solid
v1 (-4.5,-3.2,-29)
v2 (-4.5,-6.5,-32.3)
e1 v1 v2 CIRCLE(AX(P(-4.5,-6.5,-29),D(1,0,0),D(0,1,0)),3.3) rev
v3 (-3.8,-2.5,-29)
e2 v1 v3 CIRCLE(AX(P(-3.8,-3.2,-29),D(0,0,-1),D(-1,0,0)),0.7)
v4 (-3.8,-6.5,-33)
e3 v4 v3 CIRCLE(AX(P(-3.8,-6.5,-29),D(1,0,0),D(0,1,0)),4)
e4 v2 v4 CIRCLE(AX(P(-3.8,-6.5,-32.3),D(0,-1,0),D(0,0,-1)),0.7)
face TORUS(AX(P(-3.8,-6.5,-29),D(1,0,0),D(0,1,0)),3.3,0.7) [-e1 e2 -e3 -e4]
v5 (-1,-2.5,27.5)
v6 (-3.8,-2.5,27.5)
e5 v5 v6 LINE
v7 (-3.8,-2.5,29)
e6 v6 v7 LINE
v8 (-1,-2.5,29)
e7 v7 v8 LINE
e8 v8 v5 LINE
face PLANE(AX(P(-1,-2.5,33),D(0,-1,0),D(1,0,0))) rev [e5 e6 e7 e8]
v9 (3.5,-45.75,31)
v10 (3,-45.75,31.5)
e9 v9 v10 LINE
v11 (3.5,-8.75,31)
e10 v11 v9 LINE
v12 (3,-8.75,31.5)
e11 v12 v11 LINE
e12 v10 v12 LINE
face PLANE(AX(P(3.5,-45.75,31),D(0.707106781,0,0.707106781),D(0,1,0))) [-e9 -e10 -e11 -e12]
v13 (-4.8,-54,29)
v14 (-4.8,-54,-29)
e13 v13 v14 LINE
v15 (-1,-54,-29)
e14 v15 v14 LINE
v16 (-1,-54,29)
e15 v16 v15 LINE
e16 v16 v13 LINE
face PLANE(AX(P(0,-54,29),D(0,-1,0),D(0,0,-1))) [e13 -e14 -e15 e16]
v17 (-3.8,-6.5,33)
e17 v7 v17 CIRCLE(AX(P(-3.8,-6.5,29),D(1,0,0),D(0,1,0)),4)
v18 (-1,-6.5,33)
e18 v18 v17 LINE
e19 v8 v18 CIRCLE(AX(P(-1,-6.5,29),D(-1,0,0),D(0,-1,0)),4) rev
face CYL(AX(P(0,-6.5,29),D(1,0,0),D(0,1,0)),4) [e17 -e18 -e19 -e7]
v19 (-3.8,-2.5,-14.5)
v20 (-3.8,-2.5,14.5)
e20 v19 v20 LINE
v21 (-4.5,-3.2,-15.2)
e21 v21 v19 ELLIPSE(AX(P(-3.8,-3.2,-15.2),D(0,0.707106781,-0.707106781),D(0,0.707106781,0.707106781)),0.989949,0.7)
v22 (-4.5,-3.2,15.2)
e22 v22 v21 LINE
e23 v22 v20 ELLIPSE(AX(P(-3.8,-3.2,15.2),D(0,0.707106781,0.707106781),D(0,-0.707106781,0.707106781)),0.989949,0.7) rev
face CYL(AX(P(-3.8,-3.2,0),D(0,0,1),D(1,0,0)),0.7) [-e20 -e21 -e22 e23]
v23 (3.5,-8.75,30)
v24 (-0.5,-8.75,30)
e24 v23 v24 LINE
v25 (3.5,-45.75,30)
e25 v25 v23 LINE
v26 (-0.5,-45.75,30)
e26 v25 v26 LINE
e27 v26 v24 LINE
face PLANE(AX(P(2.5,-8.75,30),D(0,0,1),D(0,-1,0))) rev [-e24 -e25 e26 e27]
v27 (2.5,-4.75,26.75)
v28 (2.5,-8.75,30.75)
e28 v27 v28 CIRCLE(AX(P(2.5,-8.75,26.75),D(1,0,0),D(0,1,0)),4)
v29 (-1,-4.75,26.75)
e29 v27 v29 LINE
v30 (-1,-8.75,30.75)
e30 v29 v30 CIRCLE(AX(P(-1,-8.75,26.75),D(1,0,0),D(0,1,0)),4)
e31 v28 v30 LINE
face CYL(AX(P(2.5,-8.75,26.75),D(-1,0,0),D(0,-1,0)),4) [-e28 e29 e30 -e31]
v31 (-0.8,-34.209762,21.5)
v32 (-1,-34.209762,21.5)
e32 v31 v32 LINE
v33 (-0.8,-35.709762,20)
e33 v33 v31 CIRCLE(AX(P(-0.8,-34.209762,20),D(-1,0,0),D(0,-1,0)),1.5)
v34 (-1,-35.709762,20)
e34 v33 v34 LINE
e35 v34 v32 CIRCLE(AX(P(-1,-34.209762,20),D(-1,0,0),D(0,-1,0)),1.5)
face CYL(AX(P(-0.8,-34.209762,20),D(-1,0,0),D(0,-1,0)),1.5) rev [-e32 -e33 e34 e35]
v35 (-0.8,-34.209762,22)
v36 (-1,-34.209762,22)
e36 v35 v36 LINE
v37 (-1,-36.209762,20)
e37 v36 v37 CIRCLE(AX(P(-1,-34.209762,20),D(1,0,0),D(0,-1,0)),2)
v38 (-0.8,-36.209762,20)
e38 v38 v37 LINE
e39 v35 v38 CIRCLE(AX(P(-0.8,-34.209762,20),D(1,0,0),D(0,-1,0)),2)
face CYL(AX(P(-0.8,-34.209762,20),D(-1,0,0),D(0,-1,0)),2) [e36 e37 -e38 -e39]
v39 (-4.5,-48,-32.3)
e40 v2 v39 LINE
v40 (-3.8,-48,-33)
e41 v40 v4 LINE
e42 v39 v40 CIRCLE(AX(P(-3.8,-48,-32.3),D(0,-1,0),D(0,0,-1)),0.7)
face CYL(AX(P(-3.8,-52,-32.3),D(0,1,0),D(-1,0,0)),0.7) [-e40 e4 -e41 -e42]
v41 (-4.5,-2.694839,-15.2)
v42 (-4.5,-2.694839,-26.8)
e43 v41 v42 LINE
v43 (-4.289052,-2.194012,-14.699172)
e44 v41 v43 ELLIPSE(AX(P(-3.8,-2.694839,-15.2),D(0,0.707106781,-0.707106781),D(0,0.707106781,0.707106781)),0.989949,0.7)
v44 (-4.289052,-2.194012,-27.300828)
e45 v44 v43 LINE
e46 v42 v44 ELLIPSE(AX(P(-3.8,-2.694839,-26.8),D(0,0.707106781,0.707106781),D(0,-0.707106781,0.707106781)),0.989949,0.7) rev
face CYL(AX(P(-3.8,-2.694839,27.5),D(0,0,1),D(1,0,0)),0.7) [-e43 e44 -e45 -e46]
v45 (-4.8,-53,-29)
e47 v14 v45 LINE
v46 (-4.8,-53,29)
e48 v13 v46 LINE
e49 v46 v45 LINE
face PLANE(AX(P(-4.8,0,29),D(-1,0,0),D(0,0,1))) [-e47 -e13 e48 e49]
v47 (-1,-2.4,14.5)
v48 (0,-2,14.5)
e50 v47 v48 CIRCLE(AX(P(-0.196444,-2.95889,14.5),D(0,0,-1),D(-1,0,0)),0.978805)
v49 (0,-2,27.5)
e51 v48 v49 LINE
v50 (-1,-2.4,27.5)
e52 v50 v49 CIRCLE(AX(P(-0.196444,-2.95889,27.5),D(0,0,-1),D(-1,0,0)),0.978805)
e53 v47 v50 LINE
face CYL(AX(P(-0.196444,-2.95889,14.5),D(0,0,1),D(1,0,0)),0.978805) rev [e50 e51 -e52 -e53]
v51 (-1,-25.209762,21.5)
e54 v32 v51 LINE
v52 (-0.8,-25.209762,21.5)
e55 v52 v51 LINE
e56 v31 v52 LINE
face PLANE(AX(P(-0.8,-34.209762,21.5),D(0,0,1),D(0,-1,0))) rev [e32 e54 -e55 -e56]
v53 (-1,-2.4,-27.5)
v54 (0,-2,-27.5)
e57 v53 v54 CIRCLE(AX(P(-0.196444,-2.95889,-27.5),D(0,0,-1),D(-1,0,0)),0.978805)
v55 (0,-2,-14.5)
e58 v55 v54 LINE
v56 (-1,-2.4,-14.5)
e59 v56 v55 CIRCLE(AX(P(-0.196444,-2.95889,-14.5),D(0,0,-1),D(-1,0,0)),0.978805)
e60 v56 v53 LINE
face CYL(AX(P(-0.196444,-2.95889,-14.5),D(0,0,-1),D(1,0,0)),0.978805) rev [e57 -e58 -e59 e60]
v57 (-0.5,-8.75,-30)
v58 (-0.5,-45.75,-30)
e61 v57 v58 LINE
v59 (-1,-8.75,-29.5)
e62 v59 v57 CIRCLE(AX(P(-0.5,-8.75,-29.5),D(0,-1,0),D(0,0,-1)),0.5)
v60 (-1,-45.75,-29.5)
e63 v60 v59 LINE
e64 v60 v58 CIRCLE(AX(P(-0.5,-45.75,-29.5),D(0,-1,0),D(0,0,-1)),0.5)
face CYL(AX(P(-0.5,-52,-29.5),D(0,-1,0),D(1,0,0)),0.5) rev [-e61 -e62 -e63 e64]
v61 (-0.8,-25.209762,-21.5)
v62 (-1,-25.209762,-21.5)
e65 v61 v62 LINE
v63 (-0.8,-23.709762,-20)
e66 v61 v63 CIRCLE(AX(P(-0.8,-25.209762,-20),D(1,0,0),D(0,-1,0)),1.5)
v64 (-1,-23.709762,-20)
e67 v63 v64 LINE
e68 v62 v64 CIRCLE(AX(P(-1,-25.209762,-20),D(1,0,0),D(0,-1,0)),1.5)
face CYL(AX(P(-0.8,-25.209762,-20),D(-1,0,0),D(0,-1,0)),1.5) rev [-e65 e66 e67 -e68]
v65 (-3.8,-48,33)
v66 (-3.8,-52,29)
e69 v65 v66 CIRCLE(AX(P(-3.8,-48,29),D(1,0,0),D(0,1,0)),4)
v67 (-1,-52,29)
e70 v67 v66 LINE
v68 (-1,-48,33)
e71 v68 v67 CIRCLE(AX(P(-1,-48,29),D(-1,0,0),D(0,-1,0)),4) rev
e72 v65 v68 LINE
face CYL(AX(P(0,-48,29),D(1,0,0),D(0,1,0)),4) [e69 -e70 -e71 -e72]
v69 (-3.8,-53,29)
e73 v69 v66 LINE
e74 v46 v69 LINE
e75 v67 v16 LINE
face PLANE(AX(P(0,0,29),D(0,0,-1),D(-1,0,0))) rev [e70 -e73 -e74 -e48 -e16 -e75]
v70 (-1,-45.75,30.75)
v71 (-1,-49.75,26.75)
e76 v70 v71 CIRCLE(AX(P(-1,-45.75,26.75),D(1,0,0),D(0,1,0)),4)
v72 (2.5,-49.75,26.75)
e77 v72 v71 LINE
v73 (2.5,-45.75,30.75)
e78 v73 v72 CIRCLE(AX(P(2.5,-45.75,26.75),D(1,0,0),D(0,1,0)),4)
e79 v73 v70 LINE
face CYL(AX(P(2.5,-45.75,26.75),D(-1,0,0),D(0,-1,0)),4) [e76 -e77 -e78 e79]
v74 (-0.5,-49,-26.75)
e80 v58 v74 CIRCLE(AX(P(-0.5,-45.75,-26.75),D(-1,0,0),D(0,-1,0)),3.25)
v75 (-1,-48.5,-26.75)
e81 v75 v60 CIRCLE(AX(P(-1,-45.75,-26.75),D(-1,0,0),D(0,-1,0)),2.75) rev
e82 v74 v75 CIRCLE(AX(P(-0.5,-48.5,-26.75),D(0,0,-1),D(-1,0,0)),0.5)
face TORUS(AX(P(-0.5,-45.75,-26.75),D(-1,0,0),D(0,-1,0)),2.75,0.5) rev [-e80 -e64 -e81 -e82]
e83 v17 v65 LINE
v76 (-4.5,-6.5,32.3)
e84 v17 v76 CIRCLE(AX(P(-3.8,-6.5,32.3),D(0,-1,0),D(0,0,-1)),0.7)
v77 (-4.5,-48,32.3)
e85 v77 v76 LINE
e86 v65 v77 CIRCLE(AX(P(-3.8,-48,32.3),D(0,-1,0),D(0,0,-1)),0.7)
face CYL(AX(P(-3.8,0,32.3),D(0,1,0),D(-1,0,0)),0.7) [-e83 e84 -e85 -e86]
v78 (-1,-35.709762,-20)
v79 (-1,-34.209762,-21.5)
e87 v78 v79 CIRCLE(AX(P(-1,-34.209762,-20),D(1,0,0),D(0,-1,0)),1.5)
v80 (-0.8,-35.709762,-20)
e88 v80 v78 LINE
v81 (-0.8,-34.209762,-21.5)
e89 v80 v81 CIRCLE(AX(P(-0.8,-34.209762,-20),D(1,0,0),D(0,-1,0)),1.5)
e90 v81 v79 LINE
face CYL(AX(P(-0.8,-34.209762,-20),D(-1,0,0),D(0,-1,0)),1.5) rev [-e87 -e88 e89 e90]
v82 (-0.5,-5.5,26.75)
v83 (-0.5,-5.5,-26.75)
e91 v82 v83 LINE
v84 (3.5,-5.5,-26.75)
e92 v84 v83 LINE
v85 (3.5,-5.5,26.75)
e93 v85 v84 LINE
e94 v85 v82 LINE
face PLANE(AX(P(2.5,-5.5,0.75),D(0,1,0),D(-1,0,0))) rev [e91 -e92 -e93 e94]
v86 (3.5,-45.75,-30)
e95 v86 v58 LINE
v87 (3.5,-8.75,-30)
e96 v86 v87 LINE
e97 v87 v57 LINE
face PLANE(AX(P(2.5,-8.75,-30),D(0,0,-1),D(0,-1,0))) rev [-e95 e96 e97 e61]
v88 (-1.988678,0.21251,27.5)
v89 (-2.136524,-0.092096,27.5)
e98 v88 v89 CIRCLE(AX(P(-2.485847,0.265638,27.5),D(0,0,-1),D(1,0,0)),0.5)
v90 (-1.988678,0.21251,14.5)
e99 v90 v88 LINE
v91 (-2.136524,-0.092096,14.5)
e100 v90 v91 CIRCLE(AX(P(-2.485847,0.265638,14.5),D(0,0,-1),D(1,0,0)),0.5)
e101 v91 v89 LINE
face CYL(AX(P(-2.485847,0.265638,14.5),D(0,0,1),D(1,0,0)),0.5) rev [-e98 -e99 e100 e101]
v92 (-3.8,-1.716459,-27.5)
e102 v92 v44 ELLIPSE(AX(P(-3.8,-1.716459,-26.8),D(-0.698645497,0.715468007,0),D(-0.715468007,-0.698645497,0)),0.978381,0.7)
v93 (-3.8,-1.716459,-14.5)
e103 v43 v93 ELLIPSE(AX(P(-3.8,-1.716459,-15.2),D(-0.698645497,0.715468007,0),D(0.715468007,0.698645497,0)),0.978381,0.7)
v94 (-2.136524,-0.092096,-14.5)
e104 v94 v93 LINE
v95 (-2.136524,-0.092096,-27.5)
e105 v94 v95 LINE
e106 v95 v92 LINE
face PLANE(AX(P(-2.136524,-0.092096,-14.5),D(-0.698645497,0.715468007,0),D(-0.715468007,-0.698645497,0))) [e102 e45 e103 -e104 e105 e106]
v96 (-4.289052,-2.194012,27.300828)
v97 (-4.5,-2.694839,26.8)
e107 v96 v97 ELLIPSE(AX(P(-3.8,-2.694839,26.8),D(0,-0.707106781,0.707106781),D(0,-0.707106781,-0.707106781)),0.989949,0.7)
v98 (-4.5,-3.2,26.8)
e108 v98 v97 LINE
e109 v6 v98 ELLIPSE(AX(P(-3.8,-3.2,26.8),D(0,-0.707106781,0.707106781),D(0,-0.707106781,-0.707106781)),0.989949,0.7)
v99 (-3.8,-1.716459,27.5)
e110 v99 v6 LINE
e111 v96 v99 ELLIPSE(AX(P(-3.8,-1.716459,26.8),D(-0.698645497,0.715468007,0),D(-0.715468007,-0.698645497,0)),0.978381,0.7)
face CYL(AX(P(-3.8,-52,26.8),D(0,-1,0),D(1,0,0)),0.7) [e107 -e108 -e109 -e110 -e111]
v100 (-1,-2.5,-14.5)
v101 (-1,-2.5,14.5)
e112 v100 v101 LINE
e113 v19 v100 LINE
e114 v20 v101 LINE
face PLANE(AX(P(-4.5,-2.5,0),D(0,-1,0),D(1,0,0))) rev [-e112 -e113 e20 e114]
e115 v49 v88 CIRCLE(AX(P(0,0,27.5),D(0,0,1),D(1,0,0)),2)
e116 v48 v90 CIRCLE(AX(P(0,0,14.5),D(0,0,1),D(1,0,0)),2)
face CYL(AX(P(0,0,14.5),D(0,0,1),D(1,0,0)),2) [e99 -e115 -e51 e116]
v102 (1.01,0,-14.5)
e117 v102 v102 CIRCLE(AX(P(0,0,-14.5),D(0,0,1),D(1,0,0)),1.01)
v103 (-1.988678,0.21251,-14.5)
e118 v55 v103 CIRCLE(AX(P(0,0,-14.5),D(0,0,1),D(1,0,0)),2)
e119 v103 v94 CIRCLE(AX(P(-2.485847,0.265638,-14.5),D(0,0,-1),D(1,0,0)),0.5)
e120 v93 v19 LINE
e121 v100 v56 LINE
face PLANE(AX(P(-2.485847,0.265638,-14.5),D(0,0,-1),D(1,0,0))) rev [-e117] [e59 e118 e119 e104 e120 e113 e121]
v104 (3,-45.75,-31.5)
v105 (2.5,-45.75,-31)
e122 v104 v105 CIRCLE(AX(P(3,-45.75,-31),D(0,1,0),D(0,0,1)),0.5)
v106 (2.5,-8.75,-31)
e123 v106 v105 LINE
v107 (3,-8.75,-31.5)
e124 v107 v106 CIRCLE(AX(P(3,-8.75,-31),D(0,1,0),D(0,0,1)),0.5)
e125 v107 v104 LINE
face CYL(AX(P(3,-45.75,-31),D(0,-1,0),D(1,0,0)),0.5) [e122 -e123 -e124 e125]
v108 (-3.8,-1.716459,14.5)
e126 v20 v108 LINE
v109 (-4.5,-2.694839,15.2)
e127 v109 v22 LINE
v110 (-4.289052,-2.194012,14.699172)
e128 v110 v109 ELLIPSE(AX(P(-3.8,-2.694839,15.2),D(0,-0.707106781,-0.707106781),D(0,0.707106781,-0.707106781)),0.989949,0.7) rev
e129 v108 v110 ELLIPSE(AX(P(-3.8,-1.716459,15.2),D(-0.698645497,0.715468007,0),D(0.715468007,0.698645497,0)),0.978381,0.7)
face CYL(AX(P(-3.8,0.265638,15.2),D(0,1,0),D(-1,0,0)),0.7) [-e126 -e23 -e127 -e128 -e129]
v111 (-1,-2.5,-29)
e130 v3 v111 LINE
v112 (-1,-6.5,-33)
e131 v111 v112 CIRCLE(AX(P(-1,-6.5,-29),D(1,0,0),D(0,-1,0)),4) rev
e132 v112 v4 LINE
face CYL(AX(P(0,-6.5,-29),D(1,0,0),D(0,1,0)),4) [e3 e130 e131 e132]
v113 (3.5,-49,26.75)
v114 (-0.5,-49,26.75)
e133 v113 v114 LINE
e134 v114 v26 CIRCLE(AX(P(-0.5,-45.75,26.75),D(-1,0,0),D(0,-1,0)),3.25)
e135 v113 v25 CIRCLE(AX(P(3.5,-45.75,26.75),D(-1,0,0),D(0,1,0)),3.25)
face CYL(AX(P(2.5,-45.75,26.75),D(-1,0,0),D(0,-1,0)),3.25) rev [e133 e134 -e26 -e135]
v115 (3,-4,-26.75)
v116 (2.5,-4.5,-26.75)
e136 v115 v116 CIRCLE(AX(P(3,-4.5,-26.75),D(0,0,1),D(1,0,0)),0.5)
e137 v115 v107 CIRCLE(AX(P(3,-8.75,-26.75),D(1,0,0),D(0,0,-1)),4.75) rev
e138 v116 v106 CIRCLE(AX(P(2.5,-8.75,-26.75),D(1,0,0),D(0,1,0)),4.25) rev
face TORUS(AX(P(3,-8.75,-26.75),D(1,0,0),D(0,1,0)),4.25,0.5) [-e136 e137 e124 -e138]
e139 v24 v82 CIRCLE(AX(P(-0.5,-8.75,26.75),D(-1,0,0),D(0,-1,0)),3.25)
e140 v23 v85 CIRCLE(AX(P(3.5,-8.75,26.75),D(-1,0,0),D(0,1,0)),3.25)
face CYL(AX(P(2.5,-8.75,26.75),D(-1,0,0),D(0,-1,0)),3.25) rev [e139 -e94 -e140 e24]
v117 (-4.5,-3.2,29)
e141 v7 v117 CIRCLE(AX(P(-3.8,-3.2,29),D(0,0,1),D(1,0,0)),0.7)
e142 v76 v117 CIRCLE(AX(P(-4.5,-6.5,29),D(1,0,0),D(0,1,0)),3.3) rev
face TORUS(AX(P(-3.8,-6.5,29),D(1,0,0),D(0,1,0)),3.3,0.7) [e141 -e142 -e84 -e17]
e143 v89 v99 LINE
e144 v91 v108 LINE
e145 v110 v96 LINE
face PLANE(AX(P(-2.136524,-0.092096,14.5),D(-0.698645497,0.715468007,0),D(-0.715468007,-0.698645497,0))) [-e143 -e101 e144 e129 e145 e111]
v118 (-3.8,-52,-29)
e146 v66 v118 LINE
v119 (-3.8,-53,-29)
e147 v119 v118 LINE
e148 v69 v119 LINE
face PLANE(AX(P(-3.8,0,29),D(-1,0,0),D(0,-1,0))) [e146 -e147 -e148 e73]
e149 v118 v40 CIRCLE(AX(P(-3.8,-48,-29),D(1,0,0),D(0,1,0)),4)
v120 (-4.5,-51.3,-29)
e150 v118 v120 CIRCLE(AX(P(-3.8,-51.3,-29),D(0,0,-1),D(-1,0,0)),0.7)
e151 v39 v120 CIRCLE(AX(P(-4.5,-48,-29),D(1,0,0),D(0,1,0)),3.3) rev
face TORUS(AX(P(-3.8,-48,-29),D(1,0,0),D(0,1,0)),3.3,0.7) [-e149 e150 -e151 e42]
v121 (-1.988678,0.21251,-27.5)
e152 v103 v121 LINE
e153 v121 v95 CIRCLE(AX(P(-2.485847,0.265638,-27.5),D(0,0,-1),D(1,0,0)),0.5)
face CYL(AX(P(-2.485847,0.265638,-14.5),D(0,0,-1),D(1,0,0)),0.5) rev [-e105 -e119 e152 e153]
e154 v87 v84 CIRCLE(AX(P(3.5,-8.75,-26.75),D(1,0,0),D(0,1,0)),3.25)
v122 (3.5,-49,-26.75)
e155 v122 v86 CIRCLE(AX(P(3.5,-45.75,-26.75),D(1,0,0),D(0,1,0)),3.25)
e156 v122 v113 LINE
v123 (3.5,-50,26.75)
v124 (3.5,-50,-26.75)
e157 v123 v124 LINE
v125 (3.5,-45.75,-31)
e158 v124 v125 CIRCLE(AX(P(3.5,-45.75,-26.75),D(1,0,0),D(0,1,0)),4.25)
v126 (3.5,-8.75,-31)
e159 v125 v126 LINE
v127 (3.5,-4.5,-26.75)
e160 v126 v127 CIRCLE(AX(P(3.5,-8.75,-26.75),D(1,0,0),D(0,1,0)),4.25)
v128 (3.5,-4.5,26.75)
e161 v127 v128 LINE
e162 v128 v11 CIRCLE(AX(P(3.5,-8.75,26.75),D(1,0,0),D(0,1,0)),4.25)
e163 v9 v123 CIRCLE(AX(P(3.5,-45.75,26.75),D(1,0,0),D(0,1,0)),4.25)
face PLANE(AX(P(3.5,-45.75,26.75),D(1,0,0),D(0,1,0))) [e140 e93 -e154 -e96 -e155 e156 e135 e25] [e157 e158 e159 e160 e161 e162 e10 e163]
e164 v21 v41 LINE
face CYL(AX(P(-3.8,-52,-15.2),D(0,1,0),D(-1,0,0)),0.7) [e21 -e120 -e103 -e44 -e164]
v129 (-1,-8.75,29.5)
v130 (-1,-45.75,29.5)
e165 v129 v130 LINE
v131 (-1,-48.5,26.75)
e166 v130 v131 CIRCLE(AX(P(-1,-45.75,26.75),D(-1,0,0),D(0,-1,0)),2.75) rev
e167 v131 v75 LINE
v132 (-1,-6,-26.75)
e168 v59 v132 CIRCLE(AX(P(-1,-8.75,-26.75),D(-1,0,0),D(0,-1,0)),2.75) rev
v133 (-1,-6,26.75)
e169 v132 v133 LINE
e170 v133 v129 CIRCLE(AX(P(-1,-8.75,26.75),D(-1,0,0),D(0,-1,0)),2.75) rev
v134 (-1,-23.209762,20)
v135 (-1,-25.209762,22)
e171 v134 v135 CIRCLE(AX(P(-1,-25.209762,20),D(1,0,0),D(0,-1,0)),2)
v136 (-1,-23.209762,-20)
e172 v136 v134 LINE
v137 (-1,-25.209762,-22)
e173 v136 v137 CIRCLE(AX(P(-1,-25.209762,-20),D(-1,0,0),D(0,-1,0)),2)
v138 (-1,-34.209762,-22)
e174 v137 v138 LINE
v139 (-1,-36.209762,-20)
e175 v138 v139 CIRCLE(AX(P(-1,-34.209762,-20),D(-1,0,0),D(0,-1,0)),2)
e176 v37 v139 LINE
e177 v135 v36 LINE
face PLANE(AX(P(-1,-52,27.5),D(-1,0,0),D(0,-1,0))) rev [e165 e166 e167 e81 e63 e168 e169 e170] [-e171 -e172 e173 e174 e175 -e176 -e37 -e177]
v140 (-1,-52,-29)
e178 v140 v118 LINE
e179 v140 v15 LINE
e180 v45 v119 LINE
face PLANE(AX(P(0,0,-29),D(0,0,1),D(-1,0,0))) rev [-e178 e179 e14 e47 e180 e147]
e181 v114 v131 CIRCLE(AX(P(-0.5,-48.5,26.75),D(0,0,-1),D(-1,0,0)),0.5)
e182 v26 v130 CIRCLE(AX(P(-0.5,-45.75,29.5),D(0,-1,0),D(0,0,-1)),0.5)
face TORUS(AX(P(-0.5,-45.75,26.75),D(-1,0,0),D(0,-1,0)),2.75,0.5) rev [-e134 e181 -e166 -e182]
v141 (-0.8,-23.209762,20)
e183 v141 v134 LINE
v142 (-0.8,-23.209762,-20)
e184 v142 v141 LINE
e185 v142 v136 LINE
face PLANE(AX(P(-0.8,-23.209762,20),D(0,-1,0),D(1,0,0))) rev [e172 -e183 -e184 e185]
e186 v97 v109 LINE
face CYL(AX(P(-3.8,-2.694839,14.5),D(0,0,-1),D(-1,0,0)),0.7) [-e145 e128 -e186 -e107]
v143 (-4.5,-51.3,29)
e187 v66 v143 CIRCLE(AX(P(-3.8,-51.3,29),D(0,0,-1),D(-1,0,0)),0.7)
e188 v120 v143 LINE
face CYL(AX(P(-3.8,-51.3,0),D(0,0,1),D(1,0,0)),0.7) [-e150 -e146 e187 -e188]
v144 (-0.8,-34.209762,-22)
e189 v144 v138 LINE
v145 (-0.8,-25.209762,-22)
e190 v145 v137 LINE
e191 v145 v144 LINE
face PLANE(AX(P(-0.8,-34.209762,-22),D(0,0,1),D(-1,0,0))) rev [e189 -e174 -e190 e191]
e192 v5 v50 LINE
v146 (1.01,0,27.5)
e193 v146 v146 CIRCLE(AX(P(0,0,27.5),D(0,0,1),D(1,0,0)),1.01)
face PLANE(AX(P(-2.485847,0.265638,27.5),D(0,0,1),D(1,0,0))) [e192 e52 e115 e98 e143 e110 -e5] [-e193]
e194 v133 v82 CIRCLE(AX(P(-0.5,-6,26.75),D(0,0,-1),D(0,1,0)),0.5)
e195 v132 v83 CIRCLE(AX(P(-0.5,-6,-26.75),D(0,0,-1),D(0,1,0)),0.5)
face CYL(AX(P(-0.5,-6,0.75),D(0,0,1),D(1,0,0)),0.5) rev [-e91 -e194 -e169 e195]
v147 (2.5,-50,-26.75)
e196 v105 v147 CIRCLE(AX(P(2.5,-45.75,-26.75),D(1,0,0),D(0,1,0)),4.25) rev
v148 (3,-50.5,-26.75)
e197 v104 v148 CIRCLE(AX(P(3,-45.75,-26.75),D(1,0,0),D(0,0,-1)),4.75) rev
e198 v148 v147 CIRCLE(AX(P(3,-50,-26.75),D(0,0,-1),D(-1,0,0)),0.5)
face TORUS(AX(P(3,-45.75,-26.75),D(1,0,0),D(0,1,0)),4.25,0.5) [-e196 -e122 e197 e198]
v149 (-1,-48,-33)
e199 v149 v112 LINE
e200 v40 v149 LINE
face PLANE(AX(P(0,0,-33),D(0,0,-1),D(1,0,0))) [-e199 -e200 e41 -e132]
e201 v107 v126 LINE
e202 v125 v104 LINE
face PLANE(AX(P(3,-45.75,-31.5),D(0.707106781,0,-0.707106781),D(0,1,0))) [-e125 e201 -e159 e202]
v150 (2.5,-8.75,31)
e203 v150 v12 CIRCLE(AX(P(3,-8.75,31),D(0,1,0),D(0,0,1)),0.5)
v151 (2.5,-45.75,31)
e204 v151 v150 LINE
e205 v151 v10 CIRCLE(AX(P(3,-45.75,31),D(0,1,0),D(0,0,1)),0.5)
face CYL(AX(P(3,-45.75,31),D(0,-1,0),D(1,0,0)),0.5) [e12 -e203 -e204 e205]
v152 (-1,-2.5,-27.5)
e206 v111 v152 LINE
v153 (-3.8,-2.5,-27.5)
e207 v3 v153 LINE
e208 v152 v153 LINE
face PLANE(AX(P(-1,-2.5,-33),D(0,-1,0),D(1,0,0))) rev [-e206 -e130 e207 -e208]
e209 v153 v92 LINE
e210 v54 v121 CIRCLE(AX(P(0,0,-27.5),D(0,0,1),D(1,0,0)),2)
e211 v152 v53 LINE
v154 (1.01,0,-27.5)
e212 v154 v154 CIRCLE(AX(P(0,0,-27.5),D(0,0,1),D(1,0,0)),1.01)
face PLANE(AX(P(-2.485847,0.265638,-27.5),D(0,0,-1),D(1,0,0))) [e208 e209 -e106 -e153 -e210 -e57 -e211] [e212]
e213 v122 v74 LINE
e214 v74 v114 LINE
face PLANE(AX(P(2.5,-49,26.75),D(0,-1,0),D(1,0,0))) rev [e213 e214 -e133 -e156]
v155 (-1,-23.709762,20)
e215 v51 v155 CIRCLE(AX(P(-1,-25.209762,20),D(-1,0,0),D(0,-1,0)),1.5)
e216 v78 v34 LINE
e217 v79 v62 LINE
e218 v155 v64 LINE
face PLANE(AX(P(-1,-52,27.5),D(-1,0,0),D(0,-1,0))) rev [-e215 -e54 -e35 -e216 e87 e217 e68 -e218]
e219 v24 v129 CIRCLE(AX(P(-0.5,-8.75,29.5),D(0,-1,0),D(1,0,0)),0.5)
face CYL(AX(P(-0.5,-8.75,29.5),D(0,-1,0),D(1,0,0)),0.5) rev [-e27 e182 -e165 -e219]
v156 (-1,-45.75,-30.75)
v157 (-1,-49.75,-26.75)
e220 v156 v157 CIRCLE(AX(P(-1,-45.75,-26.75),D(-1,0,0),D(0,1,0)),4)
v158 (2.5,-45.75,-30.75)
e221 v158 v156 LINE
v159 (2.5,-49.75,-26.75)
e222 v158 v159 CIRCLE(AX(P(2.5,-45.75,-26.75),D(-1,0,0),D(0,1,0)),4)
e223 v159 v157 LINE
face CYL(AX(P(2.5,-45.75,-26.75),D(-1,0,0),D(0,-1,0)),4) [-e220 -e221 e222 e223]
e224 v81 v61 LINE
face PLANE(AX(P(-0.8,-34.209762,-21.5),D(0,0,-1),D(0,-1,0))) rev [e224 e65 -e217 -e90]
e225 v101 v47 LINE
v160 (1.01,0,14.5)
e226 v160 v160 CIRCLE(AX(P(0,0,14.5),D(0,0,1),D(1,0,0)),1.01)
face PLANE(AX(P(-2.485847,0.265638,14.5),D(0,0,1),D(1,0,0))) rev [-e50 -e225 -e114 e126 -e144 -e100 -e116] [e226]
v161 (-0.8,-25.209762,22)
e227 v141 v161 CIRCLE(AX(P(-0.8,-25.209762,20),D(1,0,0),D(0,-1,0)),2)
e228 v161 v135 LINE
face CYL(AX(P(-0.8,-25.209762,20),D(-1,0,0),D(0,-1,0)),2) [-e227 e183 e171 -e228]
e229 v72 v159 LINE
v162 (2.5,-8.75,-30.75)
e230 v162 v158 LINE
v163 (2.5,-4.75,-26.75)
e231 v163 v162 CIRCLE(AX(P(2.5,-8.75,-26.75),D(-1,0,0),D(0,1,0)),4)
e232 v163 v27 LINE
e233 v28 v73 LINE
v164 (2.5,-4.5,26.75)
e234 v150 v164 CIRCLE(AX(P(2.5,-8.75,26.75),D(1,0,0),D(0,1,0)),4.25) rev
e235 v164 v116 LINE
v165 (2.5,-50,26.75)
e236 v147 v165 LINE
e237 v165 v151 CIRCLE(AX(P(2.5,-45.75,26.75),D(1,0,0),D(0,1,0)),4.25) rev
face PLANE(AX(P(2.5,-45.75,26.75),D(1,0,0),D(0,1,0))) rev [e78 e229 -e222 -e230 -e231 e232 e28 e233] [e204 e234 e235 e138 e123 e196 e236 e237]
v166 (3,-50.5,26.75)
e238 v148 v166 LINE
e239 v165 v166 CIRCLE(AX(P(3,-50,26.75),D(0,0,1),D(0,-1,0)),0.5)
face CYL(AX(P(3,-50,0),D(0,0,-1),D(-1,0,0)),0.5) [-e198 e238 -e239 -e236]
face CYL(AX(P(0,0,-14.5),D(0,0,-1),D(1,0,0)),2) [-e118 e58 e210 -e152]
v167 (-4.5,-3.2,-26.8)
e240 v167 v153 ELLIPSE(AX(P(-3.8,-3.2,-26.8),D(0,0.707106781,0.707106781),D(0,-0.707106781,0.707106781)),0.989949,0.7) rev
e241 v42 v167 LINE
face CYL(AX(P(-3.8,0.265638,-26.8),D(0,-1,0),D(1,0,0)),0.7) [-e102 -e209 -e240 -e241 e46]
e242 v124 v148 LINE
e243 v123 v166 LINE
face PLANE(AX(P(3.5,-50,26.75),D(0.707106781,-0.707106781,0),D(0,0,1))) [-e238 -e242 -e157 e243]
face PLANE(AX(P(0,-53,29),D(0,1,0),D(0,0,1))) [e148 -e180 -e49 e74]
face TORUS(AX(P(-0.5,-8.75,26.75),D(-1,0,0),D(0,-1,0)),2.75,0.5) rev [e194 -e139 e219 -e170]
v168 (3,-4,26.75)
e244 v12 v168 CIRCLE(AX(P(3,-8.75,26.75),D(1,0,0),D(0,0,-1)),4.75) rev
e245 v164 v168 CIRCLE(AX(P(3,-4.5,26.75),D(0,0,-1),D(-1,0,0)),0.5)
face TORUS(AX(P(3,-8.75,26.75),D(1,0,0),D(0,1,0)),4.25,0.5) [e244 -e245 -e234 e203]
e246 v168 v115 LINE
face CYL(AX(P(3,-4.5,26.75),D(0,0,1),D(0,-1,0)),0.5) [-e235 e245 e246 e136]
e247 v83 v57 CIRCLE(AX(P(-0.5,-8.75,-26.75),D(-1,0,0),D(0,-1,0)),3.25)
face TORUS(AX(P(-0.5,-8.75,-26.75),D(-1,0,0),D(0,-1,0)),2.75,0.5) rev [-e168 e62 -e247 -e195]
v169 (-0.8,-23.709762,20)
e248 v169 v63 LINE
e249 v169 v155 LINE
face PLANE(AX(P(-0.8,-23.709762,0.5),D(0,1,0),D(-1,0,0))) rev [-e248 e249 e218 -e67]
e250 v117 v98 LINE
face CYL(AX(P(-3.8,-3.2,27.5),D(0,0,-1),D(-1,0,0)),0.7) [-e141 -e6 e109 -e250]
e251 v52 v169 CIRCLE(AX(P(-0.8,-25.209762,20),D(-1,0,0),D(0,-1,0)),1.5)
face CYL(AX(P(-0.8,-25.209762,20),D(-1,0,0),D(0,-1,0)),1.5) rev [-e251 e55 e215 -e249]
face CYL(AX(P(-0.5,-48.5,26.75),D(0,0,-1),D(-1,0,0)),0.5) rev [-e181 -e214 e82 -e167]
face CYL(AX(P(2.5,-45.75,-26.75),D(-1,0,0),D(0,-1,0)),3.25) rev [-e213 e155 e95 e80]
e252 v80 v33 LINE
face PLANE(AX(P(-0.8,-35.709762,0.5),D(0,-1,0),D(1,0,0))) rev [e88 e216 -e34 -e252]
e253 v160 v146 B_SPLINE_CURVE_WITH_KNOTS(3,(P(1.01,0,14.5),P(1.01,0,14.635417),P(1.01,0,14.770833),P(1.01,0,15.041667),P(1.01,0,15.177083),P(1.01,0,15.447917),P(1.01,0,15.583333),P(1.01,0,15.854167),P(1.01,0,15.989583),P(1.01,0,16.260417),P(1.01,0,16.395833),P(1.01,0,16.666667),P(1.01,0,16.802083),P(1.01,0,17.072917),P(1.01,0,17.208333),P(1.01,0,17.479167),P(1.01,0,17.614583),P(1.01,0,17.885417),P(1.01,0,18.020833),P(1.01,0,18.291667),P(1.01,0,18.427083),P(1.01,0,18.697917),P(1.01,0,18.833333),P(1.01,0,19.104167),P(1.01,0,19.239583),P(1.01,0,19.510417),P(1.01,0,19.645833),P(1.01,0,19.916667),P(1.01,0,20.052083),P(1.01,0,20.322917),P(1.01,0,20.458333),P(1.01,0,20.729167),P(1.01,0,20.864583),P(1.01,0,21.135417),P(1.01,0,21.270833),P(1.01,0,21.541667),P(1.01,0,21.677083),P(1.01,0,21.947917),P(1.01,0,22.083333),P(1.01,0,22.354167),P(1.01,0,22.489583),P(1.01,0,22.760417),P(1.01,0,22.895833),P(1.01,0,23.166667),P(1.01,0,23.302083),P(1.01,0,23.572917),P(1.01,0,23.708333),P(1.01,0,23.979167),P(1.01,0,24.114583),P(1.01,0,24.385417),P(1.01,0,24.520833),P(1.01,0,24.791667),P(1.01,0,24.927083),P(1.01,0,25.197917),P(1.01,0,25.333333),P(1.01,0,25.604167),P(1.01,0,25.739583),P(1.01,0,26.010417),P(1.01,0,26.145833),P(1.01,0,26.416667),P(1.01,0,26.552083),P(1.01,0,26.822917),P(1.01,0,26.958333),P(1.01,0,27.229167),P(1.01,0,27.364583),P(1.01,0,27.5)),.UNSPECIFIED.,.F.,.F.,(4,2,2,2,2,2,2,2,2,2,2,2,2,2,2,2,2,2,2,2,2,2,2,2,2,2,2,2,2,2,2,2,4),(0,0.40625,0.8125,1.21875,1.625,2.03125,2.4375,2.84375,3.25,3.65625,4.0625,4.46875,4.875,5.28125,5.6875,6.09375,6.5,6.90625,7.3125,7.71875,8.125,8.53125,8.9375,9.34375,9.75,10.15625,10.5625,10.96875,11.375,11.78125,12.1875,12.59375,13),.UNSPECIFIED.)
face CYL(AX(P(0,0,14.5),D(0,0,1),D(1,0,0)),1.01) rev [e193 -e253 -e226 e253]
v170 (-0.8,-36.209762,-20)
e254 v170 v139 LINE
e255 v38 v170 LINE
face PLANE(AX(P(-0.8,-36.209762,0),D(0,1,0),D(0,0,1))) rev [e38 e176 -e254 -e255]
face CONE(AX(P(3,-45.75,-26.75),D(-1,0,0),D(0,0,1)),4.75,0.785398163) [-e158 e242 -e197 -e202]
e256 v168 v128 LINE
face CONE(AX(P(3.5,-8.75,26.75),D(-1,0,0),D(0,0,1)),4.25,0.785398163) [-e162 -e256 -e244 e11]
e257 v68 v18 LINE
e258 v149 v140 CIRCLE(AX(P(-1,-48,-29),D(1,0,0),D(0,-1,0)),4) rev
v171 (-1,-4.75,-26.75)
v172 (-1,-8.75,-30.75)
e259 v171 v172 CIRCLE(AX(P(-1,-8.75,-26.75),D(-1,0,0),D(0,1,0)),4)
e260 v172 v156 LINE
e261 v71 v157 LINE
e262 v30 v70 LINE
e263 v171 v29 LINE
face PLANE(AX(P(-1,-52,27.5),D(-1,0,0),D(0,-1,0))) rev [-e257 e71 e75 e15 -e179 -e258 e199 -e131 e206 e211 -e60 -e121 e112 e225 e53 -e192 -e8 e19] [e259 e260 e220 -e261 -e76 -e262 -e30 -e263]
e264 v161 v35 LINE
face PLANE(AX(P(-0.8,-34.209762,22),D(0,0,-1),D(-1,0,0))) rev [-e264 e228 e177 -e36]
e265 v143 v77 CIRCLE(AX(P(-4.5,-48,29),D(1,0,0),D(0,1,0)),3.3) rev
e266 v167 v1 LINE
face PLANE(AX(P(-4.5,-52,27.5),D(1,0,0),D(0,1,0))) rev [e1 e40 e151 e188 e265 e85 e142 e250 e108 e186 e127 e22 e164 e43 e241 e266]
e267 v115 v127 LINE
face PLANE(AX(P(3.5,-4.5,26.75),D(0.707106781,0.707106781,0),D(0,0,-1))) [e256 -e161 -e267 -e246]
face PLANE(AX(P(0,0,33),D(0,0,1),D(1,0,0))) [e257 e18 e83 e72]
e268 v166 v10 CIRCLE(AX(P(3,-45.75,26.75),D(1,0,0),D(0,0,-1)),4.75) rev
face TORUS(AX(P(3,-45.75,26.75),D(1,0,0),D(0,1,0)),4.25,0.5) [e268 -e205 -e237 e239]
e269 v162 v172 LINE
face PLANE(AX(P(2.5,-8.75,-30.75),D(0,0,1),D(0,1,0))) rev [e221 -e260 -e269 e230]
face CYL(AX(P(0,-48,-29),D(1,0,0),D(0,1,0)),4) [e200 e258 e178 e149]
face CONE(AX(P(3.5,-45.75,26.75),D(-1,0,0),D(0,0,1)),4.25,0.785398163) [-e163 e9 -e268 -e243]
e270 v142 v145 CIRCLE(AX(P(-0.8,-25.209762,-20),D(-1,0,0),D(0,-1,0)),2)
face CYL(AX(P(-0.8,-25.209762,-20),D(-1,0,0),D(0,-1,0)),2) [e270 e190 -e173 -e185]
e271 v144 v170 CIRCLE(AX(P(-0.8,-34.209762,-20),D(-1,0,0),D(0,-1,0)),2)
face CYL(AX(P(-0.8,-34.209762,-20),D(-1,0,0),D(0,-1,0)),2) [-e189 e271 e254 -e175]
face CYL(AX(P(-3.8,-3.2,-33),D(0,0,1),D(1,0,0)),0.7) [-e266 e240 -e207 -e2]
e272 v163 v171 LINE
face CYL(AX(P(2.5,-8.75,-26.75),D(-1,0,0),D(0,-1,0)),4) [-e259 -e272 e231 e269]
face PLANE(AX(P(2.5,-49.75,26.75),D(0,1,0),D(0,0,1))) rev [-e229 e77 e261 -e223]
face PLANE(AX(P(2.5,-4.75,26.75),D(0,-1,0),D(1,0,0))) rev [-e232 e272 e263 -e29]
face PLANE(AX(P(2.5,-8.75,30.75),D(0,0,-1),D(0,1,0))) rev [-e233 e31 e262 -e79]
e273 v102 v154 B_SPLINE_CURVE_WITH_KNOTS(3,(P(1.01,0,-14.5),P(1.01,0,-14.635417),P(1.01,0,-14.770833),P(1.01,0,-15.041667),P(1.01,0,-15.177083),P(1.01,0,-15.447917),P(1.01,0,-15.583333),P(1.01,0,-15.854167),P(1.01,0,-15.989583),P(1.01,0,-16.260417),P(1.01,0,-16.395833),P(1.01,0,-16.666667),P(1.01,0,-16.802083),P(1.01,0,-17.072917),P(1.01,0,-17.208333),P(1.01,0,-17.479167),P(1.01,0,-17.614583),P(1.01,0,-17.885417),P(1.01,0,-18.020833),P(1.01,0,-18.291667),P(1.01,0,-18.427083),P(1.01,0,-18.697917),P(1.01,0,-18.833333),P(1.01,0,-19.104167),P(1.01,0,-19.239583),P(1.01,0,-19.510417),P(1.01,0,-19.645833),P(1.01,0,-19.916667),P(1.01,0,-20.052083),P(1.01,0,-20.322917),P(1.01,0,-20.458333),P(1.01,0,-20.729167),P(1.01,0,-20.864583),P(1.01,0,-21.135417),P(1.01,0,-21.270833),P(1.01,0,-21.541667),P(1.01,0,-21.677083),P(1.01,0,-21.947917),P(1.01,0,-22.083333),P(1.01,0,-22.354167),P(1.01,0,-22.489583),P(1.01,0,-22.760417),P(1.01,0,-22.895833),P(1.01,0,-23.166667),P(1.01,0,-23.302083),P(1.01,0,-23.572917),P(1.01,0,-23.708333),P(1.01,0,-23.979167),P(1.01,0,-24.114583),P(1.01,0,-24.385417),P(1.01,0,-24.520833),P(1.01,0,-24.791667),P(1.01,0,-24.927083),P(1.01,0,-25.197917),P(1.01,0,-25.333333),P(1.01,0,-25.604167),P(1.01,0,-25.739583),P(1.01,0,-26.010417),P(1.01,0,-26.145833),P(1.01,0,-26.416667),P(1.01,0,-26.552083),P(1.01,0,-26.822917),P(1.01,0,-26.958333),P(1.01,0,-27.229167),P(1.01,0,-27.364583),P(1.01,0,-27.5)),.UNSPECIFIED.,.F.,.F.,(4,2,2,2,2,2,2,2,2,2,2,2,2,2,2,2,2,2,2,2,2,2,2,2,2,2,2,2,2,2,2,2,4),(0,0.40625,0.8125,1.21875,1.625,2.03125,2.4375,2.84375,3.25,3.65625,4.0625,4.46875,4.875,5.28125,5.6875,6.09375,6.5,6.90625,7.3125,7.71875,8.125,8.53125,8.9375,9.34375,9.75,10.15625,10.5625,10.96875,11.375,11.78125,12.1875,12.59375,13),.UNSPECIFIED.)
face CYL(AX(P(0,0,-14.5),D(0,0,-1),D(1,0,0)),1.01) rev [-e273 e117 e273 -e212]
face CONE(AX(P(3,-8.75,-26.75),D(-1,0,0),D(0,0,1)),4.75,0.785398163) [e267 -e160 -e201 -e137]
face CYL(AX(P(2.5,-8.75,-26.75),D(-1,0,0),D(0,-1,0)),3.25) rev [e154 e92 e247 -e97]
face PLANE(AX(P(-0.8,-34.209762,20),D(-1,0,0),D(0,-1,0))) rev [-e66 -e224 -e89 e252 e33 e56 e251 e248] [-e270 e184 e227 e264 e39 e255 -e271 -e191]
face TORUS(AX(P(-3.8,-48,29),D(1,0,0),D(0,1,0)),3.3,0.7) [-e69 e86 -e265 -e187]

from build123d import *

# Parameters (mm, degrees)
SKETCH1_R            = 1
BOSS_EXTRUDE1_DEPTH  = 27.5
SKETCH2_R            = 1.01
BOSS_EXTRUDE2_DEPTH  = 13
SKETCH3_W            = 3.5
SKETCH3_H            = 13
BOSS_EXTRUDE3_DEPTH  = 49.6
SKETCH7_W            = 3.5
SKETCH7_H            = 49.5
BOSS_EXTRUDE6_DEPTH  = 5.5
SKETCH8_W            = 3.5
SKETCH8_H            = 49.5
BOSS_EXTRUDE7_DEPTH  = 14.5
FILLET2_R            = 4
BOSS_EXTRUDE8_DEPTH  = 29
BOSS_EXTRUDE9_DEPTH  = 0.2
BOSS_EXTRUDE11_DEPTH = 3.5
BOSS_EXTRUDE12_DEPTH = 1
FILLET2_OF_MIRROR1_R = 4
SKETCH15_R           = 1
CUT_EXTRUDE1_DEPTH   = 82.236014181
CHAMFER1_SIZE        = 0.5
FILLET3_R            = 0.5
FILLET4_R            = 0.5
FILLET6_R            = 0.7


with BuildPart() as part:
    # Sketch1 → Boss-Extrude1 (new body)
    with BuildSketch(Plane.XY):
        Circle(SKETCH1_R)
    boss_extrude1 = extrude(amount=BOSS_EXTRUDE1_DEPTH)


with BuildPart() as body_2:
    # Sketch2 → Boss-Extrude2 (new body)
    with BuildSketch(Plane.XY.offset(27.5)):
        with BuildLine():
            Line((-2.136524473, -0.092095918), (-4.5, -2.4))
            Line((-4.5, -2.4), (-1, -2.4))
            ThreePointArc((-1, -2.4), (-0.559963282, -2.050091796), (0, -2))
            ThreePointArc((0, -2), (1.487450997, 1.336970281), (-1.988677777, 0.212510468))
            ThreePointArc((-1.988677777, 0.212510468), (-2.036032236, 0.047311543), (-2.136524473, -0.092095918))
        make_face()
        Circle(SKETCH2_R, mode=Mode.SUBTRACT)
    boss_extrude2 = extrude(amount=-BOSS_EXTRUDE2_DEPTH)

    # Sketch3 → Boss-Extrude3 (add)
    with BuildSketch(Plane.XZ.offset(2.4)):
        with Locations((-2.75, 21)):
            Rectangle(SKETCH3_W, SKETCH3_H)
    boss_extrude3 = extrude(amount=BOSS_EXTRUDE3_DEPTH)

    # Sketch7 → Boss-Extrude6 (add)
    with BuildSketch(Plane.XY.offset(27.5)):
        with Locations((-2.75, -27.25)):
            Rectangle(SKETCH7_W, SKETCH7_H)
    boss_extrude6 = extrude(amount=BOSS_EXTRUDE6_DEPTH)

    # Sketch8 → Boss-Extrude7 (add)
    with BuildSketch(Plane(origin=(0, 0, 14.5), x_dir=(-1, 0, 0), z_dir=(0, 0, -1))):
        with Locations((2.75, -27.25)):
            Rectangle(SKETCH8_W, SKETCH8_H)
    boss_extrude7 = extrude(amount=BOSS_EXTRUDE7_DEPTH)

    # Fillet2
    fillet2_edges = [body_2.edges().sort_by_distance(p)[0] for p in [
        (-2.75, -2.5, 33),
        (-2.75, -52, 33),
    ]]
    fillet(fillet2_edges, radius=FILLET2_R)

    # Sketch10 → Boss-Extrude8 (add)
    with BuildSketch(Plane(origin=(0, 0, 0), x_dir=(-1, 0, 0), z_dir=(0, 0, -1))):
        Polygon((3.8, -52), (1, -52), (1, -54), (4.8, -54), (4.8, -53), (3.8, -53), align=None)
    boss_extrude8 = extrude(amount=-BOSS_EXTRUDE8_DEPTH)

    # Sketch11 → Boss-Extrude9 (add)
    with BuildSketch(Plane(origin=(-1, 0, 0), x_dir=(0, 0, -1), z_dir=(1, 0, 0))):
        with BuildLine():
            Line((0, -36.209762403), (-20, -36.209762403))
            ThreePointArc((-20, -36.209762403), (-21.414213562, -35.623975965), (-22, -34.209762403))
            Line((-22, -34.209762403), (-22, -25.209762403))
            ThreePointArc((-22, -25.209762403), (-21.414213562, -23.795548841), (-20, -23.209762403))
            Line((-20, -23.209762403), (0, -23.209762403))
            Line((0, -23.209762403), (0, -23.709762403))
            Line((0, -23.709762403), (-0.5, -23.709762403))
            Line((-0.5, -23.709762403), (-20, -23.709762403))
            ThreePointArc((-20, -23.709762403), (-21.060660172, -24.149102231), (-21.5, -25.209762403))
            Line((-21.5, -25.209762403), (-21.5, -34.209762403))
            ThreePointArc((-21.5, -34.209762403), (-21.060660172, -35.270422575), (-20, -35.709762403))
            Line((-20, -35.709762403), (-0.5, -35.709762403))
            Line((-0.5, -35.709762403), (0, -35.709762403))
            Line((0, -35.709762403), (0, -36.209762403))
        make_face()
    boss_extrude9 = extrude(amount=BOSS_EXTRUDE9_DEPTH)

    # Sketch13 → Boss-Extrude11 (add)
    with BuildSketch(Plane(origin=(-1, 0, 0), x_dir=(0, 0, -1), z_dir=(1, 0, 0))):
        with BuildLine():
            Line((-26.75, -5.5), (-0.75, -5.5))
            Line((-0.75, -5.5), (0, -5.5))
            Line((0, -5.5), (0, -4.75))
            Line((0, -4.75), (-26.75, -4.75))
            ThreePointArc((-26.75, -4.75), (-29.578427125, -5.921572875), (-30.75, -8.75))
            Line((-30.75, -8.75), (-30.75, -45.75))
            ThreePointArc((-30.75, -45.75), (-29.578427125, -48.578427125), (-26.75, -49.75))
            Line((-26.75, -49.75), (0, -49.75))
            Line((0, -49.75), (0, -49))
            Line((0, -49), (-0.75, -49))
            Line((-0.75, -49), (-26.75, -49))
            ThreePointArc((-26.75, -49), (-29.048097039, -48.048097039), (-30, -45.75))
            Line((-30, -45.75), (-30, -8.75))
            ThreePointArc((-30, -8.75), (-29.048097039, -6.451902961), (-26.75, -5.5))
        make_face()
    boss_extrude11 = extrude(amount=BOSS_EXTRUDE11_DEPTH)

    # Sketch14 → Boss-Extrude12 (add)
    with BuildSketch(Plane(origin=(2.5, 0, 0), x_dir=(0, 0, -1), z_dir=(1, 0, 0))):
        with BuildLine():
            Line((0, -49), (-26.75, -49))
            ThreePointArc((-26.75, -49), (-29.048097039, -48.048097039), (-30, -45.75))
            Line((-30, -45.75), (-30, -8.75))
            ThreePointArc((-30, -8.75), (-29.048097039, -6.451902961), (-26.75, -5.5))
            Line((-26.75, -5.5), (0, -5.5))
            Line((0, -5.5), (0, -4))
            Line((0, -4), (-26.75, -4))
            ThreePointArc((-26.75, -4), (-30.108757211, -5.391242789), (-31.5, -8.75))
            Line((-31.5, -8.75), (-31.5, -45.75))
            ThreePointArc((-31.5, -45.75), (-30.108757211, -49.108757211), (-26.75, -50.5))
            Line((-26.75, -50.5), (0, -50.5))
            Line((0, -50.5), (0, -49))
        make_face()
    boss_extrude12 = extrude(amount=BOSS_EXTRUDE12_DEPTH)


with BuildPart() as part_1:
    add(part.part)

    add(body_2.part)  # Mirror1 merges body 2
    # Mirror1: Boss-Extrude1, Boss-Extrude2, Boss-Extrude3, Boss-Extrude6, Boss-Extrude7, Boss-Extrude8, Boss-Extrude9, Boss-Extrude11, Boss-Extrude12 across plane
    add(boss_extrude1.mirror(Plane(origin=(0, 0, 0), x_dir=(1, 0, 0), z_dir=(0, 0, -1))))
    add(boss_extrude2.mirror(Plane(origin=(0, 0, 0), x_dir=(1, 0, 0), z_dir=(0, 0, -1))))
    add(boss_extrude3.mirror(Plane(origin=(0, 0, 0), x_dir=(1, 0, 0), z_dir=(0, 0, -1))))
    add(boss_extrude6.mirror(Plane(origin=(0, 0, 0), x_dir=(1, 0, 0), z_dir=(0, 0, -1))))
    add(boss_extrude7.mirror(Plane(origin=(0, 0, 0), x_dir=(1, 0, 0), z_dir=(0, 0, -1))))
    add(boss_extrude8.mirror(Plane(origin=(0, 0, 0), x_dir=(1, 0, 0), z_dir=(0, 0, -1))))
    add(boss_extrude9.mirror(Plane(origin=(0, 0, 0), x_dir=(1, 0, 0), z_dir=(0, 0, -1))))
    add(boss_extrude11.mirror(Plane(origin=(0, 0, 0), x_dir=(1, 0, 0), z_dir=(0, 0, -1))))
    add(boss_extrude12.mirror(Plane(origin=(0, 0, 0), x_dir=(1, 0, 0), z_dir=(0, 0, -1))))

    # Fillet2 of Mirror1
    fillet2_of_mirror1_edges = [part_1.edges().sort_by_distance(p)[0] for p in [
        (-2.75, -2.5, -33),
        (-2.75, -52, -33),
    ]]
    fillet(fillet2_of_mirror1_edges, radius=FILLET2_OF_MIRROR1_R)

    # Sketch15 → Cut-Extrude1 (cut, through all)
    with BuildSketch(Plane(origin=(0, 0, -27.5), x_dir=(-1, 0, 0), z_dir=(0, 0, -1))):
        Circle(SKETCH15_R)
    extrude(amount=-CUT_EXTRUDE1_DEPTH, mode=Mode.SUBTRACT)

    # Chamfer1
    chamfer1_edges = [part_1.edges().sort_by_distance(p)[0] for p in [
        (3.5, -4, 0),
        (3.5, -5.391242789, 30.108757211),
        (3.5, -27.25, 31.5),
        (3.5, -49.108757211, 30.108757211),
        (3.5, -50.5, 0),
        (3.5, -5.391242789, -30.108757211),
        (3.5, -27.25, -31.5),
        (3.5, -49.108757211, -30.108757211),
    ]]
    chamfer(chamfer1_edges, length=CHAMFER1_SIZE)

    # Fillet3
    fillet3_edges = [part_1.edges().sort_by_distance(p)[0] for p in [
        (2.5, -4, 0),
        (2.5, -5.391242789, 30.108757211),
        (2.5, -27.25, 31.5),
        (2.5, -49.108757211, 30.108757211),
        (2.5, -50.5, 0),
        (2.5, -49.108757211, -30.108757211),
        (2.5, -27.25, -31.5),
        (2.5, -5.391242789, -30.108757211),
    ]]
    fillet(fillet3_edges, radius=FILLET3_R - 0.0001)  # a hair under: the kernel refuses the full size

    # Fillet4
    fillet4_edges = [part_1.edges().sort_by_distance(p)[0] for p in [
        (-1, -49, 0),
        (-1, -48.048097039, 29.048097039),
        (-1, -27.25, 30),
        (-1, -6.451902961, 29.048097039),
        (-1, -5.5, 0),
        (-1, -48.048097039, -29.048097039),
        (-1, -27.25, -30),
        (-1, -6.451902961, -29.048097039),
    ]]
    fillet(fillet4_edges, radius=FILLET4_R)

    # Fillet6
    fillet6_edges = [part_1.edges().sort_by_distance(p)[0] for p in [
        (-4.5, -50.828427125, -31.828427125),
        (-4.5, -27.25, -33),
        (-4.5, -3.671572875, -31.828427125),
        (-4.5, -2.5, -28.25),
        (-4.5, -2.45, -27.5),
        (-4.5, -2.4, -21),
        (-4.5, -2.45, -14.5),
        (-4.5, -2.5, 0),
        (-4.5, -2.45, 14.5),
        (-4.5, -2.4, 21),
        (-4.5, -2.45, 27.5),
        (-4.5, -2.5, 28.25),
        (-4.5, -3.671572875, 31.828427125),
        (-4.5, -27.25, 33),
        (-4.5, -50.828427125, 31.828427125),
        (-4.5, -52, 0),
    ]]
    fillet(fillet6_edges, radius=FILLET6_R - 0.0001)  # a hair under: the kernel refuses the full size


solid = part_1.part
